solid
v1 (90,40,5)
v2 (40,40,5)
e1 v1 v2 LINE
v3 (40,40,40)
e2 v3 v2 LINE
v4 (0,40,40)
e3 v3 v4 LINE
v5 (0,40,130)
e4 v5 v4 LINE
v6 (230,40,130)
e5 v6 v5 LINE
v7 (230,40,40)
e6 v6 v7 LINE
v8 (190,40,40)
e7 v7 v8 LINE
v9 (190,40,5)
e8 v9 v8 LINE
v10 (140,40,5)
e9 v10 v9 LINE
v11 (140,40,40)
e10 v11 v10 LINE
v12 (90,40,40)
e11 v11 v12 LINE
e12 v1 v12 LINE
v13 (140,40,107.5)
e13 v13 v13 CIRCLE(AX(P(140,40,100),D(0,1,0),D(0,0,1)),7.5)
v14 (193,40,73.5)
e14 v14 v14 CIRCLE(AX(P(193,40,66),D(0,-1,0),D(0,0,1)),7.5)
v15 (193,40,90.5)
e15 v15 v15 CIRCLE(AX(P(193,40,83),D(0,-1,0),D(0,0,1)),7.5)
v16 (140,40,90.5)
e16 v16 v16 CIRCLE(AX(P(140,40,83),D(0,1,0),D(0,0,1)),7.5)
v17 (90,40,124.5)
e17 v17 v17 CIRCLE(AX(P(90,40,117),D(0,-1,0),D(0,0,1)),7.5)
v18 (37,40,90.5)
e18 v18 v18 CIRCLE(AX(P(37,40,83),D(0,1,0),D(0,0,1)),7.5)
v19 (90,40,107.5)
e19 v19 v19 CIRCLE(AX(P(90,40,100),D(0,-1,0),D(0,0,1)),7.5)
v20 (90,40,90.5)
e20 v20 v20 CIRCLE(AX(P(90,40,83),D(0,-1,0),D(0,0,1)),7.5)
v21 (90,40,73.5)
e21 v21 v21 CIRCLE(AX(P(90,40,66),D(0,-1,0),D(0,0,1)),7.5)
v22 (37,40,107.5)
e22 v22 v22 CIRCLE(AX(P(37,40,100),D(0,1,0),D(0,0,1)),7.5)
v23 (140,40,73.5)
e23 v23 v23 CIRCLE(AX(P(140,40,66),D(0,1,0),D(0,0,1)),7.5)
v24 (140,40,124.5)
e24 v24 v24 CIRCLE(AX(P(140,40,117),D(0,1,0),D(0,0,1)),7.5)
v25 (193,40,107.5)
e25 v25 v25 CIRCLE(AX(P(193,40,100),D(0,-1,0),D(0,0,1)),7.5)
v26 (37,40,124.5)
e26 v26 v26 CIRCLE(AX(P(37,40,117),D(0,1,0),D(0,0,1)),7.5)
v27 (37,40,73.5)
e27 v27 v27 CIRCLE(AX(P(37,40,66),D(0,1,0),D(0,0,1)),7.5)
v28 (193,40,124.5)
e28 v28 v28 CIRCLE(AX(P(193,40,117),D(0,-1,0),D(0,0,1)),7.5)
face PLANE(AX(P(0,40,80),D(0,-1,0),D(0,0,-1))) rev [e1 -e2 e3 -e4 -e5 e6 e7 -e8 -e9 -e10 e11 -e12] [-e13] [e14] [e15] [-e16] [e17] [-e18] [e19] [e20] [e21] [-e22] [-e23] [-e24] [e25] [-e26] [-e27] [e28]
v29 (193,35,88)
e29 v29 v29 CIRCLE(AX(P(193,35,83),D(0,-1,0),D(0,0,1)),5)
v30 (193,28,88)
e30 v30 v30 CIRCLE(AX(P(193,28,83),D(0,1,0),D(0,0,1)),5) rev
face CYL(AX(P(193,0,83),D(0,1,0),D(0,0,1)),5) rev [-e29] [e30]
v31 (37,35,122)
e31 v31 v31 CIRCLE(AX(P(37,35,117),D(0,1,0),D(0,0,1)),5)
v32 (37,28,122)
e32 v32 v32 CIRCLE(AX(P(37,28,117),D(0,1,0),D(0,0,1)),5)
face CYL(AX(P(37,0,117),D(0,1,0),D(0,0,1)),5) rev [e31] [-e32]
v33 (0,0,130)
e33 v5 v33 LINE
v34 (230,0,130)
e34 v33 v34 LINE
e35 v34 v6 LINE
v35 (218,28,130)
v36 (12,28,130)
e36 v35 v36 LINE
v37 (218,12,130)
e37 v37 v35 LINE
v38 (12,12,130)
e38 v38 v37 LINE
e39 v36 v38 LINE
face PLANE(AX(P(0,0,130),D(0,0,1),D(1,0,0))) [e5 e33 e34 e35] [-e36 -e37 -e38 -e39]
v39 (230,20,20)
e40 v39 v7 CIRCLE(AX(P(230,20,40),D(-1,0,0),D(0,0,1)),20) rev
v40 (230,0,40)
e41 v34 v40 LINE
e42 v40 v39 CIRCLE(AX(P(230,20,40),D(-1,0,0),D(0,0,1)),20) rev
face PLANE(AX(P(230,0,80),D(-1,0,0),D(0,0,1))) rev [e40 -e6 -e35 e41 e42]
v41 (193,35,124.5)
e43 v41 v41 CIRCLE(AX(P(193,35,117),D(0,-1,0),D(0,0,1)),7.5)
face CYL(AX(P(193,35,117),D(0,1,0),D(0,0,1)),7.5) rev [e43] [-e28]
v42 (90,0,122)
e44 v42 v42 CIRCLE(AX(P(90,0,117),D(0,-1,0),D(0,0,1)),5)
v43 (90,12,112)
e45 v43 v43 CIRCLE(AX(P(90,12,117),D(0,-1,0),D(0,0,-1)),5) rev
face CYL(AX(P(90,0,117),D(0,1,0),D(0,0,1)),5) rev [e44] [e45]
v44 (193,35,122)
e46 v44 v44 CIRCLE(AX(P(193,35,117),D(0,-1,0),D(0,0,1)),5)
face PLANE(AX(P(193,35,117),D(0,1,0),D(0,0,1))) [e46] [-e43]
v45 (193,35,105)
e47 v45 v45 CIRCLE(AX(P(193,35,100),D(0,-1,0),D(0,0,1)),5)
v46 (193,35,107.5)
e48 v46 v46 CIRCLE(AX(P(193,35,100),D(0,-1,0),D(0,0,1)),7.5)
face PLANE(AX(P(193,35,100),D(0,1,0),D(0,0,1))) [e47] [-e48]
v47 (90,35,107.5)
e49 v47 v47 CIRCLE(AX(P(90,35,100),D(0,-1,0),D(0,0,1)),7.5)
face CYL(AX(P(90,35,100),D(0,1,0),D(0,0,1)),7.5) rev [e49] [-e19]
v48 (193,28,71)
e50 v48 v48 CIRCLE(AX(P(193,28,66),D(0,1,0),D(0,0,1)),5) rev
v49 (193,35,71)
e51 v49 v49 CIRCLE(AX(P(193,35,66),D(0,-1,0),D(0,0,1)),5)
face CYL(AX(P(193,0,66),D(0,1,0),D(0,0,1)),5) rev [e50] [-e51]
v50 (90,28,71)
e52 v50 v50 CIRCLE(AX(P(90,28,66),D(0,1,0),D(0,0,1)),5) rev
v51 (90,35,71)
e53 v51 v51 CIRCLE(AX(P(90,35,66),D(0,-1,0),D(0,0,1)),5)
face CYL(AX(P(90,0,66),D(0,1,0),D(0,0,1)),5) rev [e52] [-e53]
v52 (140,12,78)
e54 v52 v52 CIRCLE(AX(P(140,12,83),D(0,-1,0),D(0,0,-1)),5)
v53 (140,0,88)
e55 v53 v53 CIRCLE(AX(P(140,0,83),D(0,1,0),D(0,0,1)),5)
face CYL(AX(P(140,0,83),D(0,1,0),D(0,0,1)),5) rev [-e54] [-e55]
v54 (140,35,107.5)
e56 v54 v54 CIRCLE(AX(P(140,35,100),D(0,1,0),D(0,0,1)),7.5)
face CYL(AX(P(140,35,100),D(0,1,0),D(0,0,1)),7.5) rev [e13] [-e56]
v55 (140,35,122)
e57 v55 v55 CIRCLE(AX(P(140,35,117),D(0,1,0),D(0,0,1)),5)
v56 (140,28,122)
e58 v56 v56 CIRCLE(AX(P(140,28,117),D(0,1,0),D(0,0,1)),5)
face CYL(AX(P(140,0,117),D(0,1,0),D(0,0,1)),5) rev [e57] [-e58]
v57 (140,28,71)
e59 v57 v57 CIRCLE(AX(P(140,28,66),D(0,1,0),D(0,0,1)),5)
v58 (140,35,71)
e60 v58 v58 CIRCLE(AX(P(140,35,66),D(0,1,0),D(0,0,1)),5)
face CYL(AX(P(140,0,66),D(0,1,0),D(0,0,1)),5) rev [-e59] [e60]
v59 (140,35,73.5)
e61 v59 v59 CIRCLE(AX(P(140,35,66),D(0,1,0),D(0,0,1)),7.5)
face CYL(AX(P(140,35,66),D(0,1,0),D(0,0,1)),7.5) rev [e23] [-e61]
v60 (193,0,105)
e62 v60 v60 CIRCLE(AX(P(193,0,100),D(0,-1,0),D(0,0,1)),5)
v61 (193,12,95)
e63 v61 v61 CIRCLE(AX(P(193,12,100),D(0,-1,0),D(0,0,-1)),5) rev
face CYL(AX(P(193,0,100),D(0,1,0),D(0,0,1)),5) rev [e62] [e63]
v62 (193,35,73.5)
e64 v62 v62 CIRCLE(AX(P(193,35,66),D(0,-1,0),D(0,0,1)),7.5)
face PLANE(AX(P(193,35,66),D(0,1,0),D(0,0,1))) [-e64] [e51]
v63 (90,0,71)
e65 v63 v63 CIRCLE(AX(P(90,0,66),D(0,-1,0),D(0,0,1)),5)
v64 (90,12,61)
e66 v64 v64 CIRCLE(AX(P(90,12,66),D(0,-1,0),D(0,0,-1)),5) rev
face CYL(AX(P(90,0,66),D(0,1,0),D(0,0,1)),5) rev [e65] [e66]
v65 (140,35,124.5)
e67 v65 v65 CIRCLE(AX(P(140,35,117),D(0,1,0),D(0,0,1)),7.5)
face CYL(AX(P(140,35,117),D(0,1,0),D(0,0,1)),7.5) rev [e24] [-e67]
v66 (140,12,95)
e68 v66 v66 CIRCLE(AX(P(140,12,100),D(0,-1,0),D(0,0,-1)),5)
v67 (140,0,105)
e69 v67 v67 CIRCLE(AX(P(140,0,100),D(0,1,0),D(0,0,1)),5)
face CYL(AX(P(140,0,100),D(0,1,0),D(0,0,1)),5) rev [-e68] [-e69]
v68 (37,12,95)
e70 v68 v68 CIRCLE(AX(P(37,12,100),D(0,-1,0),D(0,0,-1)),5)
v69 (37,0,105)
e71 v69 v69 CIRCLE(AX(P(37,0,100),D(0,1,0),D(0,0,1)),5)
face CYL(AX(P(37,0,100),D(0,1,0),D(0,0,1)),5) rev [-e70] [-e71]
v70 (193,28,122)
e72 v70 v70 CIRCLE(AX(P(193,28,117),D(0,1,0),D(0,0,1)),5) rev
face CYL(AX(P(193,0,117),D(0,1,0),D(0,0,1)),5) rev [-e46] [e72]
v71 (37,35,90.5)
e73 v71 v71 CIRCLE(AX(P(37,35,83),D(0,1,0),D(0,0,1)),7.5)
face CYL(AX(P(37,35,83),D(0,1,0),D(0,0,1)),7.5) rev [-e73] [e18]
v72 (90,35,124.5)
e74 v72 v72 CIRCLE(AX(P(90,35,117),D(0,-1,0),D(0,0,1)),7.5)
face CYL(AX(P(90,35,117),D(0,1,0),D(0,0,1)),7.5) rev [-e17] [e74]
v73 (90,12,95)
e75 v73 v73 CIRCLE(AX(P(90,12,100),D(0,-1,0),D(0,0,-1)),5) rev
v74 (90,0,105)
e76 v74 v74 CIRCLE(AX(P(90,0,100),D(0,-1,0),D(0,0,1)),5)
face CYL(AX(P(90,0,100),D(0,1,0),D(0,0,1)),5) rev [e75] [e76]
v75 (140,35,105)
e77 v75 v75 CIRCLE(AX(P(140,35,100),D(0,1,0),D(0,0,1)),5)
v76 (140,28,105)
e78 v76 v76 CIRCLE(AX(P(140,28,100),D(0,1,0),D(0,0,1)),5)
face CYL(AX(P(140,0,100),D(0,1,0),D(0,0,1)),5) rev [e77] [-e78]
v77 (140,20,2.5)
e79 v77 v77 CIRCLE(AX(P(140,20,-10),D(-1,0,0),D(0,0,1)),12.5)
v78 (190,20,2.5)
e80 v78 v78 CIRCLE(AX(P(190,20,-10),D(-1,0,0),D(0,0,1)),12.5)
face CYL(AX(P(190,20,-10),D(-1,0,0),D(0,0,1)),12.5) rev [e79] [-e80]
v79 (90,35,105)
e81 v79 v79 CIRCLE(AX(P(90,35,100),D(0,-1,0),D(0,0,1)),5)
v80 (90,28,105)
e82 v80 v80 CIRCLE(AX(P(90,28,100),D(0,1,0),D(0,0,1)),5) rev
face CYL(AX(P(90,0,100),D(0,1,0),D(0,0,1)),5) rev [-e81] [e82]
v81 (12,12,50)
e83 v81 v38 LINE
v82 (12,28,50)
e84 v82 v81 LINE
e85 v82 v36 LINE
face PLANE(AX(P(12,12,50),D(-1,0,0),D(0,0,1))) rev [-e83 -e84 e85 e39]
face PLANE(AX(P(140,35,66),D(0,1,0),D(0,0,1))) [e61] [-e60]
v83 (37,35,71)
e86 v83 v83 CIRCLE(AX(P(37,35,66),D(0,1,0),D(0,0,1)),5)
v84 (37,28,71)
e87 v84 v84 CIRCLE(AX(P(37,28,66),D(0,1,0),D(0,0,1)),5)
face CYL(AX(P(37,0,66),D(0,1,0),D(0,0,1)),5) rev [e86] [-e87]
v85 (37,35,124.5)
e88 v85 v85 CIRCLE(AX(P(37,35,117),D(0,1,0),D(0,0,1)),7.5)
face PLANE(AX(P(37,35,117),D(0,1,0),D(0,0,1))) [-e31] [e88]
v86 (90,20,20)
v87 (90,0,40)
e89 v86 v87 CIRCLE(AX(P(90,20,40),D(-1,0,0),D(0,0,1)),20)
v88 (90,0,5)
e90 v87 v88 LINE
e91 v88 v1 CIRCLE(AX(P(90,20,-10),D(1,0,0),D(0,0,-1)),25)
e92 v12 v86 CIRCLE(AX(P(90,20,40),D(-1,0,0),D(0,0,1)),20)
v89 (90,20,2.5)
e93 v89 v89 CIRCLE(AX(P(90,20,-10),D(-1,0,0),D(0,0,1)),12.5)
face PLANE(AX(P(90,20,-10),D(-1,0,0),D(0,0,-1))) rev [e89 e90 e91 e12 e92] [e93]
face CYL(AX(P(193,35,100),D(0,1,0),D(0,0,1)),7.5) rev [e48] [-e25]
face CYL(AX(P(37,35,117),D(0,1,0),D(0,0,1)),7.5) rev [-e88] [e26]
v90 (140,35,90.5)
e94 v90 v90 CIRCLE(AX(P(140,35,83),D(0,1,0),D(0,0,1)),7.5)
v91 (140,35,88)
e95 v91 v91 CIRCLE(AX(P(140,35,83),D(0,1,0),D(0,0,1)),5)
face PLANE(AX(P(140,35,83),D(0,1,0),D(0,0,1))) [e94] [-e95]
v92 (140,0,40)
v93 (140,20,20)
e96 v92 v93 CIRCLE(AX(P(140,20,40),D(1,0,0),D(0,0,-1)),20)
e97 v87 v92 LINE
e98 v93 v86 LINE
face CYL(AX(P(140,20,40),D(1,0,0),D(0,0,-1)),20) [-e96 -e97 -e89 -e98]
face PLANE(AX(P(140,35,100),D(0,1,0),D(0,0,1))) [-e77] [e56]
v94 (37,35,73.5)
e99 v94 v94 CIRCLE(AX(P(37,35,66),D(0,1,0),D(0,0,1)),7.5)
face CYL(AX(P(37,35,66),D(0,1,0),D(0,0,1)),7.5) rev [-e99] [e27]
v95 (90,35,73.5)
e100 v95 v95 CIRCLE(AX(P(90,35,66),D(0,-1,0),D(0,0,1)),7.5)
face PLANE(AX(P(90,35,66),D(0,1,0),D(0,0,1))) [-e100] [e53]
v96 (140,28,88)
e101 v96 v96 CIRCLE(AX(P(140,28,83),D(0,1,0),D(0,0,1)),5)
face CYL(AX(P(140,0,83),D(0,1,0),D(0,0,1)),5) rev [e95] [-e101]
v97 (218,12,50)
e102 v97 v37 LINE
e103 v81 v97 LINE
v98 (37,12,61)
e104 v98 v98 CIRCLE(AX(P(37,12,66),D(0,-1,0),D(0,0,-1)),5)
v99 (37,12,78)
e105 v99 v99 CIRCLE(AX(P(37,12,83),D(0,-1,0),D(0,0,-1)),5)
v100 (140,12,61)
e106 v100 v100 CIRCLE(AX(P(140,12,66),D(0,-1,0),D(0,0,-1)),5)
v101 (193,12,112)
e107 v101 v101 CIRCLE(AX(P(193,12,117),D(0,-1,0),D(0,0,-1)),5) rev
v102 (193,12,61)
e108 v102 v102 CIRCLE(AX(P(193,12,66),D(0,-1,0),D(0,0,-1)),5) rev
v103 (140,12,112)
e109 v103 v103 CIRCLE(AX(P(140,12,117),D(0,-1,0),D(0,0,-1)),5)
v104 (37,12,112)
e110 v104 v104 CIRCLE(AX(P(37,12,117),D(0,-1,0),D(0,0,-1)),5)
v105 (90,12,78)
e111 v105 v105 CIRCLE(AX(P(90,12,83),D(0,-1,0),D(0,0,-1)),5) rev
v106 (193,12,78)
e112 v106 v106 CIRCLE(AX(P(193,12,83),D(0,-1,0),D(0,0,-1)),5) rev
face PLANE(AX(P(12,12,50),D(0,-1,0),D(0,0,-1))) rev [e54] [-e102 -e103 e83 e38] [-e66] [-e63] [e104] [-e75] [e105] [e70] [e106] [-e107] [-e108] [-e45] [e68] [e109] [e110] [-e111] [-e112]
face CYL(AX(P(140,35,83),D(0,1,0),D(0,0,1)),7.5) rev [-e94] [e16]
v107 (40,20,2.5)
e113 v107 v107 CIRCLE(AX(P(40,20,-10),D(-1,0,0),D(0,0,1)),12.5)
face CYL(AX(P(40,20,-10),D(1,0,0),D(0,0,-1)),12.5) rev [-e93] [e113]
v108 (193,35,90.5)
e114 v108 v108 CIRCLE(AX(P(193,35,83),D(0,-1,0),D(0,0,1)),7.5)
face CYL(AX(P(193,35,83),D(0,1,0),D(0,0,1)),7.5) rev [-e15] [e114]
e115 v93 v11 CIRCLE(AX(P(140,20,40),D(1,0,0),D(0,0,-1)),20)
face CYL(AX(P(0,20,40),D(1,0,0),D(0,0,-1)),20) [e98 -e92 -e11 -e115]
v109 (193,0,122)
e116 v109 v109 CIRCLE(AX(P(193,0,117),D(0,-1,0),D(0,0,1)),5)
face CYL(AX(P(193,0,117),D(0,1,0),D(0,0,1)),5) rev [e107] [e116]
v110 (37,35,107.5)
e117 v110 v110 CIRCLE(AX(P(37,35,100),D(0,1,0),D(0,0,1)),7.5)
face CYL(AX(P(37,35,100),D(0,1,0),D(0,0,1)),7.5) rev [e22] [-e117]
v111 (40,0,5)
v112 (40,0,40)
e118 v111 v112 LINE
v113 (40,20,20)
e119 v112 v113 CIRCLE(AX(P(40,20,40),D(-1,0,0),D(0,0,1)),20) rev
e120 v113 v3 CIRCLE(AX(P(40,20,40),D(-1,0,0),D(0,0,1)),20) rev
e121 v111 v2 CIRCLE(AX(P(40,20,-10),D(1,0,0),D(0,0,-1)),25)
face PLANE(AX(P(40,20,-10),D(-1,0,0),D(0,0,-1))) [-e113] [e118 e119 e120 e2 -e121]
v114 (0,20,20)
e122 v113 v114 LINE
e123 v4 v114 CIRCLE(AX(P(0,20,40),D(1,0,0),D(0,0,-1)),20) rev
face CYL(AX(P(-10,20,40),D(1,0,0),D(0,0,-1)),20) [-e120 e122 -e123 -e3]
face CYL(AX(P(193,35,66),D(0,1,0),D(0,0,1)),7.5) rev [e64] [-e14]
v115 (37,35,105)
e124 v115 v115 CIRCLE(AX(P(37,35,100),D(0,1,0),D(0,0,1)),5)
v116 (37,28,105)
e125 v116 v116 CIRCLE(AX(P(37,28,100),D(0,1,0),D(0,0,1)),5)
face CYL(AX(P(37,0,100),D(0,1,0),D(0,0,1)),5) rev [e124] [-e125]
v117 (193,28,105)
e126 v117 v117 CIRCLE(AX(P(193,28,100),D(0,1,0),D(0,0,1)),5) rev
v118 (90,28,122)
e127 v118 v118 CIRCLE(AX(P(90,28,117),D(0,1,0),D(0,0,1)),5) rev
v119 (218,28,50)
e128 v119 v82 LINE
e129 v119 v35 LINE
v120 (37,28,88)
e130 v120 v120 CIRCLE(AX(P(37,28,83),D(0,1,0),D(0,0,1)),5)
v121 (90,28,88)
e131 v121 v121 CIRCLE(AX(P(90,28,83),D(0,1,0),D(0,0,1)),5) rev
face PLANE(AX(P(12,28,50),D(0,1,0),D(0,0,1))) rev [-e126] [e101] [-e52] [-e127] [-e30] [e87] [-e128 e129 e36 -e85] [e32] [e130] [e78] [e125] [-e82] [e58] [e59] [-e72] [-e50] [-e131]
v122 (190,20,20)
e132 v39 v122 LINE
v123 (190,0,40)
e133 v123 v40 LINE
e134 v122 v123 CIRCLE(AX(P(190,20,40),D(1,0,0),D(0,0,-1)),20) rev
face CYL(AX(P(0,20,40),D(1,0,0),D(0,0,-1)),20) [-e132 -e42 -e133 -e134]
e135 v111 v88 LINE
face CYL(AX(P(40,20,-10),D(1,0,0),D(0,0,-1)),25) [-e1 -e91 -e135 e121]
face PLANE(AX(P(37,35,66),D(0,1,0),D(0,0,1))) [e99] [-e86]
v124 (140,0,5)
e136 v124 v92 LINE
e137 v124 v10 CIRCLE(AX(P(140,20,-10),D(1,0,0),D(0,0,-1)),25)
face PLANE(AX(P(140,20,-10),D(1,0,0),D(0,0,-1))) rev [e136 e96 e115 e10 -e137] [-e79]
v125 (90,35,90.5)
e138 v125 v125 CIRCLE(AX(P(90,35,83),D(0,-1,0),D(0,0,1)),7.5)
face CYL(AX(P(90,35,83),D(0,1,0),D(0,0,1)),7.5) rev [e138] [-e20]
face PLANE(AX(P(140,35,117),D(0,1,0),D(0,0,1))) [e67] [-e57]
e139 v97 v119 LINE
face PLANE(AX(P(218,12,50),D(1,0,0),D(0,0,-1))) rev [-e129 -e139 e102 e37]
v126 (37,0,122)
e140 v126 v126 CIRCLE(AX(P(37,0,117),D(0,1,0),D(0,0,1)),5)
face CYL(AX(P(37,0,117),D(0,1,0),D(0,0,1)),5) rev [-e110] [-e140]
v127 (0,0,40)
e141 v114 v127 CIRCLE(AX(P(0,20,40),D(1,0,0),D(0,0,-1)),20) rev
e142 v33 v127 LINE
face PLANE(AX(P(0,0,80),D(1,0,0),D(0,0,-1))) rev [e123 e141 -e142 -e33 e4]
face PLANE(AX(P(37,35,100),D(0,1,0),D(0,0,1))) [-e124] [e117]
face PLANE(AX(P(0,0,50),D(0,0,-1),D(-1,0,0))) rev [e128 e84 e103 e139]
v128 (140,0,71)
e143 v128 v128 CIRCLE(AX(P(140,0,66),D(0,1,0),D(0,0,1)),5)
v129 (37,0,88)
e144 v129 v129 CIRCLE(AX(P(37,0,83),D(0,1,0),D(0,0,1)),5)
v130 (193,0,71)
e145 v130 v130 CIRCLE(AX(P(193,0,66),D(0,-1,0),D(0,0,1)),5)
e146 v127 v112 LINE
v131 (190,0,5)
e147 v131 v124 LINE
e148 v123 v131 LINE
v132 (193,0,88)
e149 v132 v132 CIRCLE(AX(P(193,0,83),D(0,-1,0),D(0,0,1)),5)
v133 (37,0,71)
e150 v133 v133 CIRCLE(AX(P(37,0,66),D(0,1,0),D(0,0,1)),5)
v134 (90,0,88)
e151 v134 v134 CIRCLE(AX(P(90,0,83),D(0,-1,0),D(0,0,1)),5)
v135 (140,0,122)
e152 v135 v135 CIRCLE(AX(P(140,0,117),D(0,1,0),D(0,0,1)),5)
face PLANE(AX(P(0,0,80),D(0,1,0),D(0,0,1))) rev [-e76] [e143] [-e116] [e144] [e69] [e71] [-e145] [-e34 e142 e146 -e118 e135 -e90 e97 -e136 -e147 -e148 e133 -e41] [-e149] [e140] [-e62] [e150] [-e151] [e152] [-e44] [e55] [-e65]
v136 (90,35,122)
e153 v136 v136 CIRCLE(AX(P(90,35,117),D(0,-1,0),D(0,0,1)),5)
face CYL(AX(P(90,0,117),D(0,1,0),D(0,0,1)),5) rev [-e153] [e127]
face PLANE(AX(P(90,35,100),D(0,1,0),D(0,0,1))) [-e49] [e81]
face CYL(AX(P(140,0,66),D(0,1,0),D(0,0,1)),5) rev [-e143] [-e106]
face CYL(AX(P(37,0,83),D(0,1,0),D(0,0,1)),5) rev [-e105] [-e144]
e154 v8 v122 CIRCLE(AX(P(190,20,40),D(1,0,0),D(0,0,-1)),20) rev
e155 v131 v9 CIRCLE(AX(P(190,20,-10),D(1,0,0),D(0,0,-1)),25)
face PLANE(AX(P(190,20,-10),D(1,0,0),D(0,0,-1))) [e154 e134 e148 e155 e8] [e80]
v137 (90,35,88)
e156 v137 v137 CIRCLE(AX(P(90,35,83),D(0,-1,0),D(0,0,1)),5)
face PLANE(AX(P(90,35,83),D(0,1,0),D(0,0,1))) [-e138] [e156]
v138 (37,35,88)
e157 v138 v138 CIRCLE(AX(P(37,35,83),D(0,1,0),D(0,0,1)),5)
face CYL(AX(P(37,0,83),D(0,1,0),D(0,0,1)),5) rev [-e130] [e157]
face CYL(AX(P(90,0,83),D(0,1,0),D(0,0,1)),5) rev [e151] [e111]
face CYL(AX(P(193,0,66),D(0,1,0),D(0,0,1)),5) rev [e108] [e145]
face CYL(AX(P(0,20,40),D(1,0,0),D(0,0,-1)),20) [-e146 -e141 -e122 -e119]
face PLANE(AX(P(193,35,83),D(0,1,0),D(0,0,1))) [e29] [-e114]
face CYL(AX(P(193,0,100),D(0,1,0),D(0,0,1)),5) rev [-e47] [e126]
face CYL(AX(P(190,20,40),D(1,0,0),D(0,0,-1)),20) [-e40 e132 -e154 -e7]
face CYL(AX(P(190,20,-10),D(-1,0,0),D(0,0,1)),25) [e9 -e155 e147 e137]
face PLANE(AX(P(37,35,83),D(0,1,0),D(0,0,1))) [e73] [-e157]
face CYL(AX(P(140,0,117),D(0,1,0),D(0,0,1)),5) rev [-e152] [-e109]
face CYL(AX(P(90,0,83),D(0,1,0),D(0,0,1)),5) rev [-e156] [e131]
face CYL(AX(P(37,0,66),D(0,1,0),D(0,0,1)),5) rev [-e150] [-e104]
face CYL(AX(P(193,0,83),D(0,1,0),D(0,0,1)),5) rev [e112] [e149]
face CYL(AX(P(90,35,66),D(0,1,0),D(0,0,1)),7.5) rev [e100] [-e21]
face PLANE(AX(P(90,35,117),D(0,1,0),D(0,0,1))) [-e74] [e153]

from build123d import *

# Parameters (mm, degrees)
SKETCH2_W                 = 230
SKETCH2_H                 = 40
BOSS_EXTRUDE1_DEPTH       = 80
SKETCH6_R                 = 25
BOSS_EXTRUDE3_DEPTH       = 50
SKETCH7_R                 = 12.5
CUT_EXTRUDE2_DEPTH        = 50
SKETCH8_R                 = 26.5
CUT_EXTRUDE3_DEPTH        = 25
CUT_EXTRUDE4_START        = 40
SKETCH11_R                = 26.5
CUT_EXTRUDE4_DEPTH        = 40
SKETCH14_W                = 12.614661349
SKETCH14_H                = 40
CUT_EXTRUDE6_DEPTH        = 50
FILLET3_R                 = 20
FILLET3_OF_MIRROR5_R      = 20
FILLET3_OF_MIRROR8_R      = 20
SKETCH15_W                = 230
SKETCH15_H                = 40
BOSS_EXTRUDE4_DEPTH       = 50
SKETCH18_W                = 206
SKETCH18_H                = 16
CUT_EXTRUDE7_DEPTH        = 80
SKETCH21_R                = 7.5
CUT_EXTRUDE8_DEPTH        = 5
SKETCH22_R                = 5
CUT_EXTRUDE9_DEPTH        = 35
LPATTERN1_COUNT           = 4
LPATTERN1_PITCH           = 17
MIRROR9_COPY_1_SKETCH_R   = 7.5
MIRROR9_COPY_1_DEPTH      = 5
MIRROR9_COPY_2_SKETCH_R   = 7.5
MIRROR9_COPY_2_DEPTH      = 5
MIRROR9_COPY_3_SKETCH_R   = 7.5
MIRROR9_COPY_3_DEPTH      = 5
MIRROR9_COPY_4_SKETCH_R   = 5
MIRROR9_COPY_4_DEPTH      = 35
MIRROR9_COPY_5_SKETCH_R   = 5
MIRROR9_COPY_5_DEPTH      = 35
MIRROR9_COPY_6_SKETCH_R   = 5
MIRROR9_COPY_6_DEPTH      = 35
MIRROR10_COPY_1_SKETCH_R  = 7.5
MIRROR10_COPY_1_DEPTH     = 5
MIRROR10_COPY_2_SKETCH_R  = 7.5
MIRROR10_COPY_2_DEPTH     = 5
MIRROR10_COPY_3_SKETCH_R  = 7.5
MIRROR10_COPY_3_DEPTH     = 5
MIRROR10_COPY_4_SKETCH_R  = 5
MIRROR10_COPY_4_DEPTH     = 35
MIRROR10_COPY_5_SKETCH_R  = 5
MIRROR10_COPY_5_DEPTH     = 35
MIRROR10_COPY_6_SKETCH_R  = 5
MIRROR10_COPY_6_DEPTH     = 35
MIRROR10_COPY_7_SKETCH_R  = 7.5
MIRROR10_COPY_7_DEPTH     = 5
MIRROR10_COPY_8_SKETCH_R  = 5
MIRROR10_COPY_8_DEPTH     = 35
MIRROR10_COPY_9_SKETCH_R  = 7.5
MIRROR10_COPY_9_DEPTH     = 5
MIRROR10_COPY_10_SKETCH_R = 7.5
MIRROR10_COPY_10_DEPTH    = 5
MIRROR10_COPY_11_SKETCH_R = 7.5
MIRROR10_COPY_11_DEPTH    = 5
MIRROR10_COPY_12_SKETCH_R = 5
MIRROR10_COPY_12_DEPTH    = 35
MIRROR10_COPY_13_SKETCH_R = 5
MIRROR10_COPY_13_DEPTH    = 35
MIRROR10_COPY_14_SKETCH_R = 5
MIRROR10_COPY_14_DEPTH    = 35


with BuildPart() as part:
    # Sketch2 → Boss-Extrude1 (new body)
    with BuildSketch(Plane.XY):
        with Locations((115, 20)):
            Rectangle(SKETCH2_W, SKETCH2_H)
    extrude(amount=BOSS_EXTRUDE1_DEPTH)

    # Sketch6 → Boss-Extrude3 (add)
    with BuildSketch(Plane(origin=(140, 0, 0), x_dir=(0, 0, -1), z_dir=(1, 0, 0))):
        with Locations((10, 20)):
            Circle(SKETCH6_R)
    boss_extrude3 = extrude(amount=BOSS_EXTRUDE3_DEPTH)

    # Sketch7 → Cut-Extrude2 (cut)
    with BuildSketch(Plane.ZY.offset(-140)):
        with Locations(Location((-10, 20, 0), (0, 0, 36.869897646))):
            Circle(SKETCH7_R)
    cut_extrude2 = extrude(amount=-CUT_EXTRUDE2_DEPTH, mode=Mode.SUBTRACT)

    # Sketch8 → Cut-Extrude3 (cut)
    with BuildSketch(Plane.ZY.offset(-140)):
        with Locations((-10, 20)):
            Circle(SKETCH8_R)
    cut_extrude3 = extrude(amount=CUT_EXTRUDE3_DEPTH, mode=Mode.SUBTRACT)

    # Sketch11 → Cut-Extrude4 (cut)
    with BuildSketch(Plane(origin=(190, 0, 0), x_dir=(0, 0, -1), z_dir=(1, 0, 0)).offset(CUT_EXTRUDE4_START)):
        with Locations((10, 20)):
            Circle(SKETCH11_R)
    cut_extrude4 = extrude(amount=-CUT_EXTRUDE4_DEPTH, mode=Mode.SUBTRACT)

    # Mirror1: Boss-Extrude3, Cut-Extrude2, Cut-Extrude3, Cut-Extrude4 across plane
    add(boss_extrude3.mirror(Plane(origin=(115, 0, 0), x_dir=(0, 0, 1), z_dir=(1, 0, 0))))
    add(cut_extrude2.mirror(Plane(origin=(115, 0, 0), x_dir=(0, 0, 1), z_dir=(1, 0, 0))), mode=Mode.SUBTRACT)
    add(cut_extrude3.mirror(Plane(origin=(115, 0, 0), x_dir=(0, 0, 1), z_dir=(1, 0, 0))), mode=Mode.SUBTRACT)
    add(cut_extrude4.mirror(Plane(origin=(115, 0, 0), x_dir=(0, 0, 1), z_dir=(1, 0, 0))), mode=Mode.SUBTRACT)

    # Sketch14 → Cut-Extrude6 (cut)
    with BuildSketch(Plane(origin=(90, 0, 0), x_dir=(0, 0, -1), z_dir=(1, 0, 0))):
        with Locations((-13.692669326, 20)):
            Rectangle(SKETCH14_W, SKETCH14_H)
    cut_extrude6 = extrude(amount=CUT_EXTRUDE6_DEPTH, mode=Mode.SUBTRACT)

    # Fillet3
    fillet3_edges = [part.edges().sort_by_distance(p)[0] for p in [
        (115, 40, 20),
        (115, 0, 20),
    ]]
    fillet(fillet3_edges, radius=FILLET3_R - 0.0001)  # a hair under: the kernel refuses the full size

    # Mirror5: Cut-Extrude6 across plane
    add(cut_extrude6.mirror(Plane.ZY.offset(-165)), mode=Mode.SUBTRACT)

    # Fillet3 of Mirror5
    fillet3_of_mirror5_edges = [part.edges().sort_by_distance(p)[0] for p in [
        (210, 40, 20),
        (210, 0, 20),
    ]]
    fillet(fillet3_of_mirror5_edges, radius=FILLET3_OF_MIRROR5_R - 0.0001)  # a hair under: the kernel refuses the full size

    # Mirror8: Cut-Extrude6 across plane
    add(cut_extrude6.mirror(Plane(origin=(65, 0, 0), x_dir=(0, 0, 1), z_dir=(1, 0, 0))), mode=Mode.SUBTRACT)

    # Fillet3 of Mirror8
    fillet3_of_mirror8_edges = [part.edges().sort_by_distance(p)[0] for p in [
        (20, 40, 20),
        (20, 0, 20),
    ]]
    fillet(fillet3_of_mirror8_edges, radius=FILLET3_OF_MIRROR8_R - 0.0001)  # a hair under: the kernel refuses the full size

    # Sketch15 → Boss-Extrude4 (add)
    with BuildSketch(Plane.XY.offset(80)):
        with Locations((115, 20)):
            Rectangle(SKETCH15_W, SKETCH15_H)
    extrude(amount=BOSS_EXTRUDE4_DEPTH)

    # Sketch18 → Cut-Extrude7 (cut)
    with BuildSketch(Plane.XY.offset(130)):
        with Locations((115, 20)):
            Rectangle(SKETCH18_W, SKETCH18_H)
    extrude(amount=-CUT_EXTRUDE7_DEPTH, mode=Mode.SUBTRACT)

    # Sketch21 → Cut-Extrude8 (cut)
    with BuildSketch(Plane(origin=(0, 40, 0), x_dir=(1, 0, 0), z_dir=(0, 1, 0))):
        with Locations(Location((37, -66, 0), (0, 0, 270))):
            Circle(SKETCH21_R)
    cut_extrude8 = extrude(amount=-CUT_EXTRUDE8_DEPTH, mode=Mode.SUBTRACT)

    # Sketch22 → Cut-Extrude9 (cut)
    with BuildSketch(Plane(origin=(0, 35, 0), x_dir=(1, 0, 0), z_dir=(0, 1, 0))):
        with Locations(Location((37, -66, 0), (0, 0, 270))):
            Circle(SKETCH22_R)
    cut_extrude9 = extrude(amount=-CUT_EXTRUDE9_DEPTH, mode=Mode.SUBTRACT)

    # LPattern1: Cut-Extrude8, Cut-Extrude9 ×4
    with Locations(*[(0, 0, i * LPATTERN1_PITCH) for i in range(1, LPATTERN1_COUNT)]):
        add(cut_extrude8, mode=Mode.SUBTRACT)
        add(cut_extrude9, mode=Mode.SUBTRACT)

    # Mirror9: Cut-Extrude8, Cut-Extrude9 across plane
    add(cut_extrude8.mirror(Plane(origin=(63.5, 0, 0), x_dir=(0, 0, 1), z_dir=(1, 0, 0))), mode=Mode.SUBTRACT)
    add(cut_extrude9.mirror(Plane(origin=(63.5, 0, 0), x_dir=(0, 0, 1), z_dir=(1, 0, 0))), mode=Mode.SUBTRACT)

    # Mirror9 copy 1 sketch → Mirror9 copy 1 (cut)
    with BuildSketch(Plane(origin=(127, 40, 17), x_dir=(-1, 0, 0), z_dir=(0, 1, 0))):
        with Locations((37, 66)):
            Circle(MIRROR9_COPY_1_SKETCH_R)
    extrude(amount=-MIRROR9_COPY_1_DEPTH, mode=Mode.SUBTRACT)

    # Mirror9 copy 2 sketch → Mirror9 copy 2 (cut)
    with BuildSketch(Plane(origin=(127, 40, 34), x_dir=(-1, 0, 0), z_dir=(0, 1, 0))):
        with Locations((37, 66)):
            Circle(MIRROR9_COPY_2_SKETCH_R)
    extrude(amount=-MIRROR9_COPY_2_DEPTH, mode=Mode.SUBTRACT)

    # Mirror9 copy 3 sketch → Mirror9 copy 3 (cut)
    with BuildSketch(Plane(origin=(127, 40, 51), x_dir=(-1, 0, 0), z_dir=(0, 1, 0))):
        with Locations((37, 66)):
            Circle(MIRROR9_COPY_3_SKETCH_R)
    extrude(amount=-MIRROR9_COPY_3_DEPTH, mode=Mode.SUBTRACT)

    # Mirror9 copy 4 sketch → Mirror9 copy 4 (cut)
    with BuildSketch(Plane(origin=(127, 35, 17), x_dir=(-1, 0, 0), z_dir=(0, 1, 0))):
        with Locations((37, 66)):
            Circle(MIRROR9_COPY_4_SKETCH_R)
    extrude(amount=-MIRROR9_COPY_4_DEPTH, mode=Mode.SUBTRACT)

    # Mirror9 copy 5 sketch → Mirror9 copy 5 (cut)
    with BuildSketch(Plane(origin=(127, 35, 34), x_dir=(-1, 0, 0), z_dir=(0, 1, 0))):
        with Locations((37, 66)):
            Circle(MIRROR9_COPY_5_SKETCH_R)
    extrude(amount=-MIRROR9_COPY_5_DEPTH, mode=Mode.SUBTRACT)

    # Mirror9 copy 6 sketch → Mirror9 copy 6 (cut)
    with BuildSketch(Plane(origin=(127, 35, 51), x_dir=(-1, 0, 0), z_dir=(0, 1, 0))):
        with Locations((37, 66)):
            Circle(MIRROR9_COPY_6_SKETCH_R)
    extrude(amount=-MIRROR9_COPY_6_DEPTH, mode=Mode.SUBTRACT)

    # Mirror10: Cut-Extrude8, Cut-Extrude9 across plane
    add(cut_extrude8.mirror(Plane(origin=(115, 0, 0), x_dir=(0, 0, 1), z_dir=(1, 0, 0))), mode=Mode.SUBTRACT)
    add(cut_extrude9.mirror(Plane(origin=(115, 0, 0), x_dir=(0, 0, 1), z_dir=(1, 0, 0))), mode=Mode.SUBTRACT)

    # Mirror10 copy 1 sketch → Mirror10 copy 1 (cut)
    with BuildSketch(Plane(origin=(230, 40, 17), x_dir=(-1, 0, 0), z_dir=(0, 1, 0))):
        with Locations((37, 66)):
            Circle(MIRROR10_COPY_1_SKETCH_R)
    extrude(amount=-MIRROR10_COPY_1_DEPTH, mode=Mode.SUBTRACT)

    # Mirror10 copy 2 sketch → Mirror10 copy 2 (cut)
    with BuildSketch(Plane(origin=(230, 40, 34), x_dir=(-1, 0, 0), z_dir=(0, 1, 0))):
        with Locations((37, 66)):
            Circle(MIRROR10_COPY_2_SKETCH_R)
    extrude(amount=-MIRROR10_COPY_2_DEPTH, mode=Mode.SUBTRACT)

    # Mirror10 copy 3 sketch → Mirror10 copy 3 (cut)
    with BuildSketch(Plane(origin=(230, 40, 51), x_dir=(-1, 0, 0), z_dir=(0, 1, 0))):
        with Locations((37, 66)):
            Circle(MIRROR10_COPY_3_SKETCH_R)
    extrude(amount=-MIRROR10_COPY_3_DEPTH, mode=Mode.SUBTRACT)

    # Mirror10 copy 4 sketch → Mirror10 copy 4 (cut)
    with BuildSketch(Plane(origin=(230, 35, 17), x_dir=(-1, 0, 0), z_dir=(0, 1, 0))):
        with Locations((37, 66)):
            Circle(MIRROR10_COPY_4_SKETCH_R)
    extrude(amount=-MIRROR10_COPY_4_DEPTH, mode=Mode.SUBTRACT)

    # Mirror10 copy 5 sketch → Mirror10 copy 5 (cut)
    with BuildSketch(Plane(origin=(230, 35, 34), x_dir=(-1, 0, 0), z_dir=(0, 1, 0))):
        with Locations((37, 66)):
            Circle(MIRROR10_COPY_5_SKETCH_R)
    extrude(amount=-MIRROR10_COPY_5_DEPTH, mode=Mode.SUBTRACT)

    # Mirror10 copy 6 sketch → Mirror10 copy 6 (cut)
    with BuildSketch(Plane(origin=(230, 35, 51), x_dir=(-1, 0, 0), z_dir=(0, 1, 0))):
        with Locations((37, 66)):
            Circle(MIRROR10_COPY_6_SKETCH_R)
    extrude(amount=-MIRROR10_COPY_6_DEPTH, mode=Mode.SUBTRACT)

    # Mirror10 copy 7 sketch → Mirror10 copy 7 (cut)
    with BuildSketch(Plane(origin=(103, 40, 0), x_dir=(1, 0, 0), z_dir=(0, 1, 0))):
        with Locations(Location((37, -66, 0), (0, 0, 270))):
            Circle(MIRROR10_COPY_7_SKETCH_R)
    extrude(amount=-MIRROR10_COPY_7_DEPTH, mode=Mode.SUBTRACT)

    # Mirror10 copy 8 sketch → Mirror10 copy 8 (cut)
    with BuildSketch(Plane(origin=(103, 35, 0), x_dir=(1, 0, 0), z_dir=(0, 1, 0))):
        with Locations(Location((37, -66, 0), (0, 0, 270))):
            Circle(MIRROR10_COPY_8_SKETCH_R)
    extrude(amount=-MIRROR10_COPY_8_DEPTH, mode=Mode.SUBTRACT)

    # Mirror10 copy 9 sketch → Mirror10 copy 9 (cut)
    with BuildSketch(Plane(origin=(103, 40, 17), x_dir=(1, 0, 0), z_dir=(0, 1, 0))):
        with Locations(Location((37, -66, 0), (0, 0, 270))):
            Circle(MIRROR10_COPY_9_SKETCH_R)
    extrude(amount=-MIRROR10_COPY_9_DEPTH, mode=Mode.SUBTRACT)

    # Mirror10 copy 10 sketch → Mirror10 copy 10 (cut)
    with BuildSketch(Plane(origin=(103, 40, 34), x_dir=(1, 0, 0), z_dir=(0, 1, 0))):
        with Locations(Location((37, -66, 0), (0, 0, 270))):
            Circle(MIRROR10_COPY_10_SKETCH_R)
    extrude(amount=-MIRROR10_COPY_10_DEPTH, mode=Mode.SUBTRACT)

    # Mirror10 copy 11 sketch → Mirror10 copy 11 (cut)
    with BuildSketch(Plane(origin=(103, 40, 51), x_dir=(1, 0, 0), z_dir=(0, 1, 0))):
        with Locations(Location((37, -66, 0), (0, 0, 270))):
            Circle(MIRROR10_COPY_11_SKETCH_R)
    extrude(amount=-MIRROR10_COPY_11_DEPTH, mode=Mode.SUBTRACT)

    # Mirror10 copy 12 sketch → Mirror10 copy 12 (cut)
    with BuildSketch(Plane(origin=(103, 35, 17), x_dir=(1, 0, 0), z_dir=(0, 1, 0))):
        with Locations(Location((37, -66, 0), (0, 0, 270))):
            Circle(MIRROR10_COPY_12_SKETCH_R)
    extrude(amount=-MIRROR10_COPY_12_DEPTH, mode=Mode.SUBTRACT)

    # Mirror10 copy 13 sketch → Mirror10 copy 13 (cut)
    with BuildSketch(Plane(origin=(103, 35, 34), x_dir=(1, 0, 0), z_dir=(0, 1, 0))):
        with Locations(Location((37, -66, 0), (0, 0, 270))):
            Circle(MIRROR10_COPY_13_SKETCH_R)
    extrude(amount=-MIRROR10_COPY_13_DEPTH, mode=Mode.SUBTRACT)

    # Mirror10 copy 14 sketch → Mirror10 copy 14 (cut)
    with BuildSketch(Plane(origin=(103, 35, 51), x_dir=(1, 0, 0), z_dir=(0, 1, 0))):
        with Locations(Location((37, -66, 0), (0, 0, 270))):
            Circle(MIRROR10_COPY_14_SKETCH_R)
    extrude(amount=-MIRROR10_COPY_14_DEPTH, mode=Mode.SUBTRACT)


solid = part.part
